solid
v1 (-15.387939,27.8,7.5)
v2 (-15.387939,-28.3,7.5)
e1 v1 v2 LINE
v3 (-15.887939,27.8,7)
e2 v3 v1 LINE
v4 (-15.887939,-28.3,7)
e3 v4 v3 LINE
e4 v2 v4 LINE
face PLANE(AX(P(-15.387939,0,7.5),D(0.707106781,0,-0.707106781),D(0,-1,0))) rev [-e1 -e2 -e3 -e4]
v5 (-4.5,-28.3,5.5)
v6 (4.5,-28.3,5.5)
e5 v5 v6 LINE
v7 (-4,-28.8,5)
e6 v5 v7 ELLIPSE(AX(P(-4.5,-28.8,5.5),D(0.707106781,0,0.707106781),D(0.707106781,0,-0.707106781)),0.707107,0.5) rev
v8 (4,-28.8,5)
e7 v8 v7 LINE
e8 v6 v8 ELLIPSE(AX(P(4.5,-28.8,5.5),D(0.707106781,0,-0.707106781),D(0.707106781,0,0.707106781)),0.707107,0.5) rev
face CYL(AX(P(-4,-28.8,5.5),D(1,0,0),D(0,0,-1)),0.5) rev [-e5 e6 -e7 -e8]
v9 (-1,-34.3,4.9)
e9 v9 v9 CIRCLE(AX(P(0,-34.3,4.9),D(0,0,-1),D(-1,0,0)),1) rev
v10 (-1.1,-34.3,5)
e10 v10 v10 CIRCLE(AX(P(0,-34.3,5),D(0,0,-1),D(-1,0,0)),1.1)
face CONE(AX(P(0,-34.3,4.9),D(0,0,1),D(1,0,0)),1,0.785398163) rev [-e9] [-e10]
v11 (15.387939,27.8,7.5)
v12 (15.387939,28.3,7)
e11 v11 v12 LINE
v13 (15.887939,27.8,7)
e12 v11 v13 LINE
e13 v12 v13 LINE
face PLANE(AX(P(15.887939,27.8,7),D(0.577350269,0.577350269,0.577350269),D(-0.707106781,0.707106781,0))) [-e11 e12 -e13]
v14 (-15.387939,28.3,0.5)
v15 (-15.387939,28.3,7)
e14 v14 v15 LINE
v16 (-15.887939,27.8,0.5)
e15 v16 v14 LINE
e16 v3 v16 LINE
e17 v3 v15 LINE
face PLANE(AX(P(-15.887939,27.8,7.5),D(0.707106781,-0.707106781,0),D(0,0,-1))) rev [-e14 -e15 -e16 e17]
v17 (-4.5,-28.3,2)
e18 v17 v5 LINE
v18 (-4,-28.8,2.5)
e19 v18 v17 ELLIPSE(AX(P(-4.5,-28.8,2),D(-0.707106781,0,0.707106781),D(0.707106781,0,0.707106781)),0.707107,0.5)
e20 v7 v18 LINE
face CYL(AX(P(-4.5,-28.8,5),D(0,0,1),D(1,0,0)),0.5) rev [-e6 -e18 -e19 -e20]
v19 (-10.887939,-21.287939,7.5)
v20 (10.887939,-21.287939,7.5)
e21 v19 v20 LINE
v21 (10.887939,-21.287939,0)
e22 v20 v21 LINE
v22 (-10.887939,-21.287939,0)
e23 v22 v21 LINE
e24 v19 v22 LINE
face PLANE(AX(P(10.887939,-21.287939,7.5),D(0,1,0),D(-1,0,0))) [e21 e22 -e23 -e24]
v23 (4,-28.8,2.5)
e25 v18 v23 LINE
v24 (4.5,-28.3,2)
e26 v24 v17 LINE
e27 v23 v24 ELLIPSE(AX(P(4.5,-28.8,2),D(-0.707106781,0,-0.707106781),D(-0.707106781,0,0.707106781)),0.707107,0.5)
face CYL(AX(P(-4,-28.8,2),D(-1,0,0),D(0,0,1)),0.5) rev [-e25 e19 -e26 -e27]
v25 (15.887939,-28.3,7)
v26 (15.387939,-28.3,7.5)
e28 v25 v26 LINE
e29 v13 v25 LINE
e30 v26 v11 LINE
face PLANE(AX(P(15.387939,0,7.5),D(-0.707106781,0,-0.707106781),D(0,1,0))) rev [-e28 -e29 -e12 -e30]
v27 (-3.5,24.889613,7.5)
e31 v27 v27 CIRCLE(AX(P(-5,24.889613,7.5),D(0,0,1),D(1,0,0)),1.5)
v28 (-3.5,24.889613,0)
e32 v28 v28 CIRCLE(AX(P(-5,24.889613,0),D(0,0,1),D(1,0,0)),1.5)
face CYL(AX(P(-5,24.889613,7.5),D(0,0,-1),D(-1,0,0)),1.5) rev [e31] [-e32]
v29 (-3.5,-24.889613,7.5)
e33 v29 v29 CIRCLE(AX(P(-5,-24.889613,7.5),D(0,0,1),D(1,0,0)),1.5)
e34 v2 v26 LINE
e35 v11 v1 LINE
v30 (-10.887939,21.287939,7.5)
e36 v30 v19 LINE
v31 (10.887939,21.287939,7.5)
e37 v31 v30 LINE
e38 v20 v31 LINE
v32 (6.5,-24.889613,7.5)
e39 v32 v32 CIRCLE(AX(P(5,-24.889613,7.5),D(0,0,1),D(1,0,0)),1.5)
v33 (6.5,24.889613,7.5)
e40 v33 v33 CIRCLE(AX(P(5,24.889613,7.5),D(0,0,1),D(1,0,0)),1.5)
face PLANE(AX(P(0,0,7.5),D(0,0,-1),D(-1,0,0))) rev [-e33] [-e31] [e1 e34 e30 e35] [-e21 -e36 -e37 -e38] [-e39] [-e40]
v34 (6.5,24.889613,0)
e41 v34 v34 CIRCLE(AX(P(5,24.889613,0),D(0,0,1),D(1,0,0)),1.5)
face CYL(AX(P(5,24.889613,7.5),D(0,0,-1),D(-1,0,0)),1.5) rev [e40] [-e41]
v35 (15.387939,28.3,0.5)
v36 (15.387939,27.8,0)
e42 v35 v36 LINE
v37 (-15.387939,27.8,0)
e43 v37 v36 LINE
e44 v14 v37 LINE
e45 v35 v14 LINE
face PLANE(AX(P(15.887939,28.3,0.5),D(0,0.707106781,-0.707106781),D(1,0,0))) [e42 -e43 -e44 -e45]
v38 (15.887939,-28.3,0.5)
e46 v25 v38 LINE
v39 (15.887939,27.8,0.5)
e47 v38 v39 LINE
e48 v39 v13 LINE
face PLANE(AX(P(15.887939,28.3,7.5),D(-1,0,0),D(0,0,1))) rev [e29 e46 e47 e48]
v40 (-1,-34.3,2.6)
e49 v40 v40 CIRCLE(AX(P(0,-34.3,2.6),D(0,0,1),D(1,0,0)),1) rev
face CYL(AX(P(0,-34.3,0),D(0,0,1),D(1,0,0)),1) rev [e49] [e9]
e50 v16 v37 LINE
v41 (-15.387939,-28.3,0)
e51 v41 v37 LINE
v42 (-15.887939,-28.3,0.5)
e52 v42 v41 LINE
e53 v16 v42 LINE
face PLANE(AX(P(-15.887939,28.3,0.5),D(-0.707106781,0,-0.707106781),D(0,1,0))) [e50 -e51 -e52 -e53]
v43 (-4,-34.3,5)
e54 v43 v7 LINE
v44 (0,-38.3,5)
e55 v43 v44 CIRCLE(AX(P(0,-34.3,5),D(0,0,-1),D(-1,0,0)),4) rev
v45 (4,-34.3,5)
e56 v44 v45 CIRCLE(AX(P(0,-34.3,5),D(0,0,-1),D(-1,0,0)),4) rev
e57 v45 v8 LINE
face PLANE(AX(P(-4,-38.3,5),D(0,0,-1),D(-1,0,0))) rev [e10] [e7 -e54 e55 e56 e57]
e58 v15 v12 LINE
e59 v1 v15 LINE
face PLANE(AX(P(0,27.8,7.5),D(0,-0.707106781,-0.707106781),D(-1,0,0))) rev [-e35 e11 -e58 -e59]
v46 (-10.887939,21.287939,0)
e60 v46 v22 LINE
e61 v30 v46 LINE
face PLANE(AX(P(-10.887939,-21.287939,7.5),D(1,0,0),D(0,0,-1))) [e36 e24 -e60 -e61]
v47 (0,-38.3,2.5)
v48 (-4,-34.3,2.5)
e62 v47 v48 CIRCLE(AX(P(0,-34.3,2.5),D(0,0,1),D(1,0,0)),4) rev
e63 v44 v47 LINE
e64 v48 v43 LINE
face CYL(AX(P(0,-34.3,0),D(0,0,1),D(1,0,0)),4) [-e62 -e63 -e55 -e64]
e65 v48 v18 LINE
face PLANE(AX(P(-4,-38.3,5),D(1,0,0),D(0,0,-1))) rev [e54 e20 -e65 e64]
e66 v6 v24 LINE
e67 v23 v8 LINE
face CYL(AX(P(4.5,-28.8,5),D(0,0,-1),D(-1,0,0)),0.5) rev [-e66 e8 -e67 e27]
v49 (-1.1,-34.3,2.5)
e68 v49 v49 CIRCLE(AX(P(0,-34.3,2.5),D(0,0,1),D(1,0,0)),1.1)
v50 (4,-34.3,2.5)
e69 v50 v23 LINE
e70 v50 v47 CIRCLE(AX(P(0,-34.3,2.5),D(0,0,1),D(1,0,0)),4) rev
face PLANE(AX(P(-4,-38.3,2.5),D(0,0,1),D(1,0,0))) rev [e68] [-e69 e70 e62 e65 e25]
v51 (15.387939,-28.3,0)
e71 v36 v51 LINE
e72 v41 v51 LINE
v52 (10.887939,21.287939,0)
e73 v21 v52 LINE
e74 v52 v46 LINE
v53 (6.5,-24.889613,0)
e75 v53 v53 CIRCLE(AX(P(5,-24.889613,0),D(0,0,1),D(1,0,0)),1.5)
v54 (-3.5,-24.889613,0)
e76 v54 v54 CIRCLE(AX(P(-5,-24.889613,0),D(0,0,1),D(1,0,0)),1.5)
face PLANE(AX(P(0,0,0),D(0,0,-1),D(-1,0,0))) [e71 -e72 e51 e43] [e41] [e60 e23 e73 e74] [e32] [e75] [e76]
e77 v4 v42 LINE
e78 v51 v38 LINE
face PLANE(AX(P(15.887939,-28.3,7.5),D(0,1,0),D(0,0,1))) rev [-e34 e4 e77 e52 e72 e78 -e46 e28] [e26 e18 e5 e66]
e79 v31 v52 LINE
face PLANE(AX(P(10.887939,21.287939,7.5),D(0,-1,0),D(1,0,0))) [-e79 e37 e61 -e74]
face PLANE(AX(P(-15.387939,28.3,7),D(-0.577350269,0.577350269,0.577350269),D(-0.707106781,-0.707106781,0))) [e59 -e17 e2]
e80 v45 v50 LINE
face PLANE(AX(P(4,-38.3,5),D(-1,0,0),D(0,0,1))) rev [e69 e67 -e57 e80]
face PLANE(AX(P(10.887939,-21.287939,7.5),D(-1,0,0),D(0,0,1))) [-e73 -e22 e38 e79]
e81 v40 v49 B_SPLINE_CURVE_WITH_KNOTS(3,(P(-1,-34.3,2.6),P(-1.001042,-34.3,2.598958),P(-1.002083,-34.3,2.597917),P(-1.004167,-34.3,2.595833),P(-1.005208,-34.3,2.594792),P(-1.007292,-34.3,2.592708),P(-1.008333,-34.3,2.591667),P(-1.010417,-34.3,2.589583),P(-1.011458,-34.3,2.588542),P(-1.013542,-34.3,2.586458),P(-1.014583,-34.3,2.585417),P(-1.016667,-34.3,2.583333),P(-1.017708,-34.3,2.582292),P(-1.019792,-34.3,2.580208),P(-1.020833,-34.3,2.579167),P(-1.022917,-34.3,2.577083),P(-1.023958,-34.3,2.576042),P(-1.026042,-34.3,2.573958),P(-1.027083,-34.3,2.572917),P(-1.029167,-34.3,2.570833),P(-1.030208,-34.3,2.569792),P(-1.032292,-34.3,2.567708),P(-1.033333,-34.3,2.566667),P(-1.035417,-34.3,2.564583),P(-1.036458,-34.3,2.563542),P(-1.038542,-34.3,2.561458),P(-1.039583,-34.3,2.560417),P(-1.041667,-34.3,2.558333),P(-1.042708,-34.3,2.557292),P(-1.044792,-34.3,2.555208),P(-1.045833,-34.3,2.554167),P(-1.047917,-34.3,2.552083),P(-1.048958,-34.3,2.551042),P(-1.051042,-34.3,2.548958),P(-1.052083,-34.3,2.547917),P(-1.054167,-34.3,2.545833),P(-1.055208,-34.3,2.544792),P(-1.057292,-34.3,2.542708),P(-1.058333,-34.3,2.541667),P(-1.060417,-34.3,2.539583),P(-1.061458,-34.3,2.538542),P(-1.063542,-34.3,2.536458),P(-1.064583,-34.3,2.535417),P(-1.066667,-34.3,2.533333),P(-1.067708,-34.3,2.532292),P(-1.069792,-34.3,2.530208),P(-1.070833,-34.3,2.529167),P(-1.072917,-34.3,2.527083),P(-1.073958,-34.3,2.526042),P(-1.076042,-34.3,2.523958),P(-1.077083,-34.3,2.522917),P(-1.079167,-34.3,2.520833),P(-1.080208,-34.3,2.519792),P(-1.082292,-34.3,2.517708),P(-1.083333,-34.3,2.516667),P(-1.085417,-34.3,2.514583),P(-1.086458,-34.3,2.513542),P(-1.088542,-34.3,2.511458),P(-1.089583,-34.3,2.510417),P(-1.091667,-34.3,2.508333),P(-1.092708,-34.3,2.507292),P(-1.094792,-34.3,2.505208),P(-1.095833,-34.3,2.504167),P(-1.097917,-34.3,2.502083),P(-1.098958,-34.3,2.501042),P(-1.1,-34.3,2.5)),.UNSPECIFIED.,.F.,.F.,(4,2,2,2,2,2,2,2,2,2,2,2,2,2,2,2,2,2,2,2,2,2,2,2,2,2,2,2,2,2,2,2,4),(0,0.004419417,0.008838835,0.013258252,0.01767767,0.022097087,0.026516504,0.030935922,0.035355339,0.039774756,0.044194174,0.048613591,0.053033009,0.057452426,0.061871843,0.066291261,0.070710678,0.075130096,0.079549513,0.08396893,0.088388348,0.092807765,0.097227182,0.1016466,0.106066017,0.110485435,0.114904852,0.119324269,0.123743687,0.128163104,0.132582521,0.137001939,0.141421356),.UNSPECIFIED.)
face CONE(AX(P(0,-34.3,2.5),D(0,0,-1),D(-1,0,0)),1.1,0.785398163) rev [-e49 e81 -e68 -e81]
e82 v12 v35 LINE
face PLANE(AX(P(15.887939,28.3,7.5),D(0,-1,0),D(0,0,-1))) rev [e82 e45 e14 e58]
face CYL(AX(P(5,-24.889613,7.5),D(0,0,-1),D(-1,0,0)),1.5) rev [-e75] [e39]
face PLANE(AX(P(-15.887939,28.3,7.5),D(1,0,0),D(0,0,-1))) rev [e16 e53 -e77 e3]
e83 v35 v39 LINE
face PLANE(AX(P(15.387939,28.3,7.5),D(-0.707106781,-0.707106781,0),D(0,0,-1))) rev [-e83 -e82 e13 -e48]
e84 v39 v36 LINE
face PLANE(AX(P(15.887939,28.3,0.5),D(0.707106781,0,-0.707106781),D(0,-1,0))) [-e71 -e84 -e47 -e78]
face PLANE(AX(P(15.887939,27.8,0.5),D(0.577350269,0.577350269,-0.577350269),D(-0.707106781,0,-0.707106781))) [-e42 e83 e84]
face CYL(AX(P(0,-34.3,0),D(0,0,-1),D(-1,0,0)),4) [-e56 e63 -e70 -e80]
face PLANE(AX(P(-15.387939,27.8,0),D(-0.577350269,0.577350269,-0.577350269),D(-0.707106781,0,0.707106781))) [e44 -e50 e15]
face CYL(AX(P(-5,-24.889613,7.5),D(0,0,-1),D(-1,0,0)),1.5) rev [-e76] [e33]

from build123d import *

# Parameters (mm, degrees)
SKETCH2_W           = 31.775877048
SKETCH2_H           = 56.6
SKETCH2_R           = 1.5
SKETCH2_W_2         = 21.775877048
SKETCH2_H_2         = 42.575877048
BOSS_EXTRUDE1_DEPTH = 7.5
SKETCH3_W           = 8
SKETCH3_H           = 2.5
BOSS_EXTRUDE2_DEPTH = 10
SKETCH4_R           = 1
CUT_EXTRUDE1_DEPTH  = 42.765016348
FILLET1_R           = 4
FILLET3_R           = 0.5
CHAMFER1_SIZE       = 0.1
CHAMFER2_SIZE       = 0.5


with BuildPart() as part:
    # Sketch2 → Boss-Extrude1 (new body)
    with BuildSketch(Plane.XY):
        Rectangle(SKETCH2_W, SKETCH2_H)
        with Locations((5, -24.889613301)):
            Circle(SKETCH2_R, mode=Mode.SUBTRACT)
        with Locations((-5, -24.889613301)):
            Circle(SKETCH2_R, mode=Mode.SUBTRACT)
        with Locations((5, 24.889613301)):
            Circle(SKETCH2_R, mode=Mode.SUBTRACT)
        with Locations((-5, 24.889613301)):
            Circle(SKETCH2_R, mode=Mode.SUBTRACT)
        Rectangle(SKETCH2_W_2, SKETCH2_H_2, mode=Mode.SUBTRACT)
    extrude(amount=BOSS_EXTRUDE1_DEPTH)

    # Sketch3 → Boss-Extrude2 (add)
    with BuildSketch(Plane.XZ.offset(28.3)):
        with Locations((0, 3.75)):
            Rectangle(SKETCH3_W, SKETCH3_H)
    extrude(amount=BOSS_EXTRUDE2_DEPTH)

    # Sketch4 → Cut-Extrude1 (cut, through all)
    with BuildSketch(Plane.XY.offset(5)):
        with Locations((0, -34.3)):
            Circle(SKETCH4_R)
    extrude(amount=-CUT_EXTRUDE1_DEPTH, mode=Mode.SUBTRACT)

    # Fillet1
    fillet1_edges = [part.edges().sort_by_distance(p)[0] for p in [
        (4, -38.3, 3.75),
        (-4, -38.3, 3.75),
    ]]
    fillet(fillet1_edges, radius=FILLET1_R - 0.0001)  # a hair under: the kernel refuses the full size

    # Fillet3
    fillet3_edges = [part.edges().sort_by_distance(p)[0] for p in [
        (-4, -28.3, 3.75),
        (0, -28.3, 2.5),
        (4, -28.3, 3.75),
        (0, -28.3, 5),
    ]]
    fillet(fillet3_edges, radius=FILLET3_R)

    # Chamfer1
    chamfer1_edges = [part.edges().sort_by_distance(p)[0] for p in [
        (-1, -34.3, 2.5),
        (-1, -34.3, 5),
    ]]
    chamfer(chamfer1_edges, length=CHAMFER1_SIZE)

    # Chamfer2
    chamfer2_edges = [part.edges().sort_by_distance(p)[0] for p in [
        (15.887938524, 0, 7.5),
        (0, 28.3, 7.5),
        (-15.887938524, 0, 7.5),
        (0, 28.3, 0),
        (15.887938524, 0, 0),
        (-15.887938524, 0, 0),
        (-15.887938524, 28.3, 3.75),
        (15.887938524, 28.3, 3.75),
    ]]
    chamfer(chamfer2_edges, length=CHAMFER2_SIZE)


solid = part.part
